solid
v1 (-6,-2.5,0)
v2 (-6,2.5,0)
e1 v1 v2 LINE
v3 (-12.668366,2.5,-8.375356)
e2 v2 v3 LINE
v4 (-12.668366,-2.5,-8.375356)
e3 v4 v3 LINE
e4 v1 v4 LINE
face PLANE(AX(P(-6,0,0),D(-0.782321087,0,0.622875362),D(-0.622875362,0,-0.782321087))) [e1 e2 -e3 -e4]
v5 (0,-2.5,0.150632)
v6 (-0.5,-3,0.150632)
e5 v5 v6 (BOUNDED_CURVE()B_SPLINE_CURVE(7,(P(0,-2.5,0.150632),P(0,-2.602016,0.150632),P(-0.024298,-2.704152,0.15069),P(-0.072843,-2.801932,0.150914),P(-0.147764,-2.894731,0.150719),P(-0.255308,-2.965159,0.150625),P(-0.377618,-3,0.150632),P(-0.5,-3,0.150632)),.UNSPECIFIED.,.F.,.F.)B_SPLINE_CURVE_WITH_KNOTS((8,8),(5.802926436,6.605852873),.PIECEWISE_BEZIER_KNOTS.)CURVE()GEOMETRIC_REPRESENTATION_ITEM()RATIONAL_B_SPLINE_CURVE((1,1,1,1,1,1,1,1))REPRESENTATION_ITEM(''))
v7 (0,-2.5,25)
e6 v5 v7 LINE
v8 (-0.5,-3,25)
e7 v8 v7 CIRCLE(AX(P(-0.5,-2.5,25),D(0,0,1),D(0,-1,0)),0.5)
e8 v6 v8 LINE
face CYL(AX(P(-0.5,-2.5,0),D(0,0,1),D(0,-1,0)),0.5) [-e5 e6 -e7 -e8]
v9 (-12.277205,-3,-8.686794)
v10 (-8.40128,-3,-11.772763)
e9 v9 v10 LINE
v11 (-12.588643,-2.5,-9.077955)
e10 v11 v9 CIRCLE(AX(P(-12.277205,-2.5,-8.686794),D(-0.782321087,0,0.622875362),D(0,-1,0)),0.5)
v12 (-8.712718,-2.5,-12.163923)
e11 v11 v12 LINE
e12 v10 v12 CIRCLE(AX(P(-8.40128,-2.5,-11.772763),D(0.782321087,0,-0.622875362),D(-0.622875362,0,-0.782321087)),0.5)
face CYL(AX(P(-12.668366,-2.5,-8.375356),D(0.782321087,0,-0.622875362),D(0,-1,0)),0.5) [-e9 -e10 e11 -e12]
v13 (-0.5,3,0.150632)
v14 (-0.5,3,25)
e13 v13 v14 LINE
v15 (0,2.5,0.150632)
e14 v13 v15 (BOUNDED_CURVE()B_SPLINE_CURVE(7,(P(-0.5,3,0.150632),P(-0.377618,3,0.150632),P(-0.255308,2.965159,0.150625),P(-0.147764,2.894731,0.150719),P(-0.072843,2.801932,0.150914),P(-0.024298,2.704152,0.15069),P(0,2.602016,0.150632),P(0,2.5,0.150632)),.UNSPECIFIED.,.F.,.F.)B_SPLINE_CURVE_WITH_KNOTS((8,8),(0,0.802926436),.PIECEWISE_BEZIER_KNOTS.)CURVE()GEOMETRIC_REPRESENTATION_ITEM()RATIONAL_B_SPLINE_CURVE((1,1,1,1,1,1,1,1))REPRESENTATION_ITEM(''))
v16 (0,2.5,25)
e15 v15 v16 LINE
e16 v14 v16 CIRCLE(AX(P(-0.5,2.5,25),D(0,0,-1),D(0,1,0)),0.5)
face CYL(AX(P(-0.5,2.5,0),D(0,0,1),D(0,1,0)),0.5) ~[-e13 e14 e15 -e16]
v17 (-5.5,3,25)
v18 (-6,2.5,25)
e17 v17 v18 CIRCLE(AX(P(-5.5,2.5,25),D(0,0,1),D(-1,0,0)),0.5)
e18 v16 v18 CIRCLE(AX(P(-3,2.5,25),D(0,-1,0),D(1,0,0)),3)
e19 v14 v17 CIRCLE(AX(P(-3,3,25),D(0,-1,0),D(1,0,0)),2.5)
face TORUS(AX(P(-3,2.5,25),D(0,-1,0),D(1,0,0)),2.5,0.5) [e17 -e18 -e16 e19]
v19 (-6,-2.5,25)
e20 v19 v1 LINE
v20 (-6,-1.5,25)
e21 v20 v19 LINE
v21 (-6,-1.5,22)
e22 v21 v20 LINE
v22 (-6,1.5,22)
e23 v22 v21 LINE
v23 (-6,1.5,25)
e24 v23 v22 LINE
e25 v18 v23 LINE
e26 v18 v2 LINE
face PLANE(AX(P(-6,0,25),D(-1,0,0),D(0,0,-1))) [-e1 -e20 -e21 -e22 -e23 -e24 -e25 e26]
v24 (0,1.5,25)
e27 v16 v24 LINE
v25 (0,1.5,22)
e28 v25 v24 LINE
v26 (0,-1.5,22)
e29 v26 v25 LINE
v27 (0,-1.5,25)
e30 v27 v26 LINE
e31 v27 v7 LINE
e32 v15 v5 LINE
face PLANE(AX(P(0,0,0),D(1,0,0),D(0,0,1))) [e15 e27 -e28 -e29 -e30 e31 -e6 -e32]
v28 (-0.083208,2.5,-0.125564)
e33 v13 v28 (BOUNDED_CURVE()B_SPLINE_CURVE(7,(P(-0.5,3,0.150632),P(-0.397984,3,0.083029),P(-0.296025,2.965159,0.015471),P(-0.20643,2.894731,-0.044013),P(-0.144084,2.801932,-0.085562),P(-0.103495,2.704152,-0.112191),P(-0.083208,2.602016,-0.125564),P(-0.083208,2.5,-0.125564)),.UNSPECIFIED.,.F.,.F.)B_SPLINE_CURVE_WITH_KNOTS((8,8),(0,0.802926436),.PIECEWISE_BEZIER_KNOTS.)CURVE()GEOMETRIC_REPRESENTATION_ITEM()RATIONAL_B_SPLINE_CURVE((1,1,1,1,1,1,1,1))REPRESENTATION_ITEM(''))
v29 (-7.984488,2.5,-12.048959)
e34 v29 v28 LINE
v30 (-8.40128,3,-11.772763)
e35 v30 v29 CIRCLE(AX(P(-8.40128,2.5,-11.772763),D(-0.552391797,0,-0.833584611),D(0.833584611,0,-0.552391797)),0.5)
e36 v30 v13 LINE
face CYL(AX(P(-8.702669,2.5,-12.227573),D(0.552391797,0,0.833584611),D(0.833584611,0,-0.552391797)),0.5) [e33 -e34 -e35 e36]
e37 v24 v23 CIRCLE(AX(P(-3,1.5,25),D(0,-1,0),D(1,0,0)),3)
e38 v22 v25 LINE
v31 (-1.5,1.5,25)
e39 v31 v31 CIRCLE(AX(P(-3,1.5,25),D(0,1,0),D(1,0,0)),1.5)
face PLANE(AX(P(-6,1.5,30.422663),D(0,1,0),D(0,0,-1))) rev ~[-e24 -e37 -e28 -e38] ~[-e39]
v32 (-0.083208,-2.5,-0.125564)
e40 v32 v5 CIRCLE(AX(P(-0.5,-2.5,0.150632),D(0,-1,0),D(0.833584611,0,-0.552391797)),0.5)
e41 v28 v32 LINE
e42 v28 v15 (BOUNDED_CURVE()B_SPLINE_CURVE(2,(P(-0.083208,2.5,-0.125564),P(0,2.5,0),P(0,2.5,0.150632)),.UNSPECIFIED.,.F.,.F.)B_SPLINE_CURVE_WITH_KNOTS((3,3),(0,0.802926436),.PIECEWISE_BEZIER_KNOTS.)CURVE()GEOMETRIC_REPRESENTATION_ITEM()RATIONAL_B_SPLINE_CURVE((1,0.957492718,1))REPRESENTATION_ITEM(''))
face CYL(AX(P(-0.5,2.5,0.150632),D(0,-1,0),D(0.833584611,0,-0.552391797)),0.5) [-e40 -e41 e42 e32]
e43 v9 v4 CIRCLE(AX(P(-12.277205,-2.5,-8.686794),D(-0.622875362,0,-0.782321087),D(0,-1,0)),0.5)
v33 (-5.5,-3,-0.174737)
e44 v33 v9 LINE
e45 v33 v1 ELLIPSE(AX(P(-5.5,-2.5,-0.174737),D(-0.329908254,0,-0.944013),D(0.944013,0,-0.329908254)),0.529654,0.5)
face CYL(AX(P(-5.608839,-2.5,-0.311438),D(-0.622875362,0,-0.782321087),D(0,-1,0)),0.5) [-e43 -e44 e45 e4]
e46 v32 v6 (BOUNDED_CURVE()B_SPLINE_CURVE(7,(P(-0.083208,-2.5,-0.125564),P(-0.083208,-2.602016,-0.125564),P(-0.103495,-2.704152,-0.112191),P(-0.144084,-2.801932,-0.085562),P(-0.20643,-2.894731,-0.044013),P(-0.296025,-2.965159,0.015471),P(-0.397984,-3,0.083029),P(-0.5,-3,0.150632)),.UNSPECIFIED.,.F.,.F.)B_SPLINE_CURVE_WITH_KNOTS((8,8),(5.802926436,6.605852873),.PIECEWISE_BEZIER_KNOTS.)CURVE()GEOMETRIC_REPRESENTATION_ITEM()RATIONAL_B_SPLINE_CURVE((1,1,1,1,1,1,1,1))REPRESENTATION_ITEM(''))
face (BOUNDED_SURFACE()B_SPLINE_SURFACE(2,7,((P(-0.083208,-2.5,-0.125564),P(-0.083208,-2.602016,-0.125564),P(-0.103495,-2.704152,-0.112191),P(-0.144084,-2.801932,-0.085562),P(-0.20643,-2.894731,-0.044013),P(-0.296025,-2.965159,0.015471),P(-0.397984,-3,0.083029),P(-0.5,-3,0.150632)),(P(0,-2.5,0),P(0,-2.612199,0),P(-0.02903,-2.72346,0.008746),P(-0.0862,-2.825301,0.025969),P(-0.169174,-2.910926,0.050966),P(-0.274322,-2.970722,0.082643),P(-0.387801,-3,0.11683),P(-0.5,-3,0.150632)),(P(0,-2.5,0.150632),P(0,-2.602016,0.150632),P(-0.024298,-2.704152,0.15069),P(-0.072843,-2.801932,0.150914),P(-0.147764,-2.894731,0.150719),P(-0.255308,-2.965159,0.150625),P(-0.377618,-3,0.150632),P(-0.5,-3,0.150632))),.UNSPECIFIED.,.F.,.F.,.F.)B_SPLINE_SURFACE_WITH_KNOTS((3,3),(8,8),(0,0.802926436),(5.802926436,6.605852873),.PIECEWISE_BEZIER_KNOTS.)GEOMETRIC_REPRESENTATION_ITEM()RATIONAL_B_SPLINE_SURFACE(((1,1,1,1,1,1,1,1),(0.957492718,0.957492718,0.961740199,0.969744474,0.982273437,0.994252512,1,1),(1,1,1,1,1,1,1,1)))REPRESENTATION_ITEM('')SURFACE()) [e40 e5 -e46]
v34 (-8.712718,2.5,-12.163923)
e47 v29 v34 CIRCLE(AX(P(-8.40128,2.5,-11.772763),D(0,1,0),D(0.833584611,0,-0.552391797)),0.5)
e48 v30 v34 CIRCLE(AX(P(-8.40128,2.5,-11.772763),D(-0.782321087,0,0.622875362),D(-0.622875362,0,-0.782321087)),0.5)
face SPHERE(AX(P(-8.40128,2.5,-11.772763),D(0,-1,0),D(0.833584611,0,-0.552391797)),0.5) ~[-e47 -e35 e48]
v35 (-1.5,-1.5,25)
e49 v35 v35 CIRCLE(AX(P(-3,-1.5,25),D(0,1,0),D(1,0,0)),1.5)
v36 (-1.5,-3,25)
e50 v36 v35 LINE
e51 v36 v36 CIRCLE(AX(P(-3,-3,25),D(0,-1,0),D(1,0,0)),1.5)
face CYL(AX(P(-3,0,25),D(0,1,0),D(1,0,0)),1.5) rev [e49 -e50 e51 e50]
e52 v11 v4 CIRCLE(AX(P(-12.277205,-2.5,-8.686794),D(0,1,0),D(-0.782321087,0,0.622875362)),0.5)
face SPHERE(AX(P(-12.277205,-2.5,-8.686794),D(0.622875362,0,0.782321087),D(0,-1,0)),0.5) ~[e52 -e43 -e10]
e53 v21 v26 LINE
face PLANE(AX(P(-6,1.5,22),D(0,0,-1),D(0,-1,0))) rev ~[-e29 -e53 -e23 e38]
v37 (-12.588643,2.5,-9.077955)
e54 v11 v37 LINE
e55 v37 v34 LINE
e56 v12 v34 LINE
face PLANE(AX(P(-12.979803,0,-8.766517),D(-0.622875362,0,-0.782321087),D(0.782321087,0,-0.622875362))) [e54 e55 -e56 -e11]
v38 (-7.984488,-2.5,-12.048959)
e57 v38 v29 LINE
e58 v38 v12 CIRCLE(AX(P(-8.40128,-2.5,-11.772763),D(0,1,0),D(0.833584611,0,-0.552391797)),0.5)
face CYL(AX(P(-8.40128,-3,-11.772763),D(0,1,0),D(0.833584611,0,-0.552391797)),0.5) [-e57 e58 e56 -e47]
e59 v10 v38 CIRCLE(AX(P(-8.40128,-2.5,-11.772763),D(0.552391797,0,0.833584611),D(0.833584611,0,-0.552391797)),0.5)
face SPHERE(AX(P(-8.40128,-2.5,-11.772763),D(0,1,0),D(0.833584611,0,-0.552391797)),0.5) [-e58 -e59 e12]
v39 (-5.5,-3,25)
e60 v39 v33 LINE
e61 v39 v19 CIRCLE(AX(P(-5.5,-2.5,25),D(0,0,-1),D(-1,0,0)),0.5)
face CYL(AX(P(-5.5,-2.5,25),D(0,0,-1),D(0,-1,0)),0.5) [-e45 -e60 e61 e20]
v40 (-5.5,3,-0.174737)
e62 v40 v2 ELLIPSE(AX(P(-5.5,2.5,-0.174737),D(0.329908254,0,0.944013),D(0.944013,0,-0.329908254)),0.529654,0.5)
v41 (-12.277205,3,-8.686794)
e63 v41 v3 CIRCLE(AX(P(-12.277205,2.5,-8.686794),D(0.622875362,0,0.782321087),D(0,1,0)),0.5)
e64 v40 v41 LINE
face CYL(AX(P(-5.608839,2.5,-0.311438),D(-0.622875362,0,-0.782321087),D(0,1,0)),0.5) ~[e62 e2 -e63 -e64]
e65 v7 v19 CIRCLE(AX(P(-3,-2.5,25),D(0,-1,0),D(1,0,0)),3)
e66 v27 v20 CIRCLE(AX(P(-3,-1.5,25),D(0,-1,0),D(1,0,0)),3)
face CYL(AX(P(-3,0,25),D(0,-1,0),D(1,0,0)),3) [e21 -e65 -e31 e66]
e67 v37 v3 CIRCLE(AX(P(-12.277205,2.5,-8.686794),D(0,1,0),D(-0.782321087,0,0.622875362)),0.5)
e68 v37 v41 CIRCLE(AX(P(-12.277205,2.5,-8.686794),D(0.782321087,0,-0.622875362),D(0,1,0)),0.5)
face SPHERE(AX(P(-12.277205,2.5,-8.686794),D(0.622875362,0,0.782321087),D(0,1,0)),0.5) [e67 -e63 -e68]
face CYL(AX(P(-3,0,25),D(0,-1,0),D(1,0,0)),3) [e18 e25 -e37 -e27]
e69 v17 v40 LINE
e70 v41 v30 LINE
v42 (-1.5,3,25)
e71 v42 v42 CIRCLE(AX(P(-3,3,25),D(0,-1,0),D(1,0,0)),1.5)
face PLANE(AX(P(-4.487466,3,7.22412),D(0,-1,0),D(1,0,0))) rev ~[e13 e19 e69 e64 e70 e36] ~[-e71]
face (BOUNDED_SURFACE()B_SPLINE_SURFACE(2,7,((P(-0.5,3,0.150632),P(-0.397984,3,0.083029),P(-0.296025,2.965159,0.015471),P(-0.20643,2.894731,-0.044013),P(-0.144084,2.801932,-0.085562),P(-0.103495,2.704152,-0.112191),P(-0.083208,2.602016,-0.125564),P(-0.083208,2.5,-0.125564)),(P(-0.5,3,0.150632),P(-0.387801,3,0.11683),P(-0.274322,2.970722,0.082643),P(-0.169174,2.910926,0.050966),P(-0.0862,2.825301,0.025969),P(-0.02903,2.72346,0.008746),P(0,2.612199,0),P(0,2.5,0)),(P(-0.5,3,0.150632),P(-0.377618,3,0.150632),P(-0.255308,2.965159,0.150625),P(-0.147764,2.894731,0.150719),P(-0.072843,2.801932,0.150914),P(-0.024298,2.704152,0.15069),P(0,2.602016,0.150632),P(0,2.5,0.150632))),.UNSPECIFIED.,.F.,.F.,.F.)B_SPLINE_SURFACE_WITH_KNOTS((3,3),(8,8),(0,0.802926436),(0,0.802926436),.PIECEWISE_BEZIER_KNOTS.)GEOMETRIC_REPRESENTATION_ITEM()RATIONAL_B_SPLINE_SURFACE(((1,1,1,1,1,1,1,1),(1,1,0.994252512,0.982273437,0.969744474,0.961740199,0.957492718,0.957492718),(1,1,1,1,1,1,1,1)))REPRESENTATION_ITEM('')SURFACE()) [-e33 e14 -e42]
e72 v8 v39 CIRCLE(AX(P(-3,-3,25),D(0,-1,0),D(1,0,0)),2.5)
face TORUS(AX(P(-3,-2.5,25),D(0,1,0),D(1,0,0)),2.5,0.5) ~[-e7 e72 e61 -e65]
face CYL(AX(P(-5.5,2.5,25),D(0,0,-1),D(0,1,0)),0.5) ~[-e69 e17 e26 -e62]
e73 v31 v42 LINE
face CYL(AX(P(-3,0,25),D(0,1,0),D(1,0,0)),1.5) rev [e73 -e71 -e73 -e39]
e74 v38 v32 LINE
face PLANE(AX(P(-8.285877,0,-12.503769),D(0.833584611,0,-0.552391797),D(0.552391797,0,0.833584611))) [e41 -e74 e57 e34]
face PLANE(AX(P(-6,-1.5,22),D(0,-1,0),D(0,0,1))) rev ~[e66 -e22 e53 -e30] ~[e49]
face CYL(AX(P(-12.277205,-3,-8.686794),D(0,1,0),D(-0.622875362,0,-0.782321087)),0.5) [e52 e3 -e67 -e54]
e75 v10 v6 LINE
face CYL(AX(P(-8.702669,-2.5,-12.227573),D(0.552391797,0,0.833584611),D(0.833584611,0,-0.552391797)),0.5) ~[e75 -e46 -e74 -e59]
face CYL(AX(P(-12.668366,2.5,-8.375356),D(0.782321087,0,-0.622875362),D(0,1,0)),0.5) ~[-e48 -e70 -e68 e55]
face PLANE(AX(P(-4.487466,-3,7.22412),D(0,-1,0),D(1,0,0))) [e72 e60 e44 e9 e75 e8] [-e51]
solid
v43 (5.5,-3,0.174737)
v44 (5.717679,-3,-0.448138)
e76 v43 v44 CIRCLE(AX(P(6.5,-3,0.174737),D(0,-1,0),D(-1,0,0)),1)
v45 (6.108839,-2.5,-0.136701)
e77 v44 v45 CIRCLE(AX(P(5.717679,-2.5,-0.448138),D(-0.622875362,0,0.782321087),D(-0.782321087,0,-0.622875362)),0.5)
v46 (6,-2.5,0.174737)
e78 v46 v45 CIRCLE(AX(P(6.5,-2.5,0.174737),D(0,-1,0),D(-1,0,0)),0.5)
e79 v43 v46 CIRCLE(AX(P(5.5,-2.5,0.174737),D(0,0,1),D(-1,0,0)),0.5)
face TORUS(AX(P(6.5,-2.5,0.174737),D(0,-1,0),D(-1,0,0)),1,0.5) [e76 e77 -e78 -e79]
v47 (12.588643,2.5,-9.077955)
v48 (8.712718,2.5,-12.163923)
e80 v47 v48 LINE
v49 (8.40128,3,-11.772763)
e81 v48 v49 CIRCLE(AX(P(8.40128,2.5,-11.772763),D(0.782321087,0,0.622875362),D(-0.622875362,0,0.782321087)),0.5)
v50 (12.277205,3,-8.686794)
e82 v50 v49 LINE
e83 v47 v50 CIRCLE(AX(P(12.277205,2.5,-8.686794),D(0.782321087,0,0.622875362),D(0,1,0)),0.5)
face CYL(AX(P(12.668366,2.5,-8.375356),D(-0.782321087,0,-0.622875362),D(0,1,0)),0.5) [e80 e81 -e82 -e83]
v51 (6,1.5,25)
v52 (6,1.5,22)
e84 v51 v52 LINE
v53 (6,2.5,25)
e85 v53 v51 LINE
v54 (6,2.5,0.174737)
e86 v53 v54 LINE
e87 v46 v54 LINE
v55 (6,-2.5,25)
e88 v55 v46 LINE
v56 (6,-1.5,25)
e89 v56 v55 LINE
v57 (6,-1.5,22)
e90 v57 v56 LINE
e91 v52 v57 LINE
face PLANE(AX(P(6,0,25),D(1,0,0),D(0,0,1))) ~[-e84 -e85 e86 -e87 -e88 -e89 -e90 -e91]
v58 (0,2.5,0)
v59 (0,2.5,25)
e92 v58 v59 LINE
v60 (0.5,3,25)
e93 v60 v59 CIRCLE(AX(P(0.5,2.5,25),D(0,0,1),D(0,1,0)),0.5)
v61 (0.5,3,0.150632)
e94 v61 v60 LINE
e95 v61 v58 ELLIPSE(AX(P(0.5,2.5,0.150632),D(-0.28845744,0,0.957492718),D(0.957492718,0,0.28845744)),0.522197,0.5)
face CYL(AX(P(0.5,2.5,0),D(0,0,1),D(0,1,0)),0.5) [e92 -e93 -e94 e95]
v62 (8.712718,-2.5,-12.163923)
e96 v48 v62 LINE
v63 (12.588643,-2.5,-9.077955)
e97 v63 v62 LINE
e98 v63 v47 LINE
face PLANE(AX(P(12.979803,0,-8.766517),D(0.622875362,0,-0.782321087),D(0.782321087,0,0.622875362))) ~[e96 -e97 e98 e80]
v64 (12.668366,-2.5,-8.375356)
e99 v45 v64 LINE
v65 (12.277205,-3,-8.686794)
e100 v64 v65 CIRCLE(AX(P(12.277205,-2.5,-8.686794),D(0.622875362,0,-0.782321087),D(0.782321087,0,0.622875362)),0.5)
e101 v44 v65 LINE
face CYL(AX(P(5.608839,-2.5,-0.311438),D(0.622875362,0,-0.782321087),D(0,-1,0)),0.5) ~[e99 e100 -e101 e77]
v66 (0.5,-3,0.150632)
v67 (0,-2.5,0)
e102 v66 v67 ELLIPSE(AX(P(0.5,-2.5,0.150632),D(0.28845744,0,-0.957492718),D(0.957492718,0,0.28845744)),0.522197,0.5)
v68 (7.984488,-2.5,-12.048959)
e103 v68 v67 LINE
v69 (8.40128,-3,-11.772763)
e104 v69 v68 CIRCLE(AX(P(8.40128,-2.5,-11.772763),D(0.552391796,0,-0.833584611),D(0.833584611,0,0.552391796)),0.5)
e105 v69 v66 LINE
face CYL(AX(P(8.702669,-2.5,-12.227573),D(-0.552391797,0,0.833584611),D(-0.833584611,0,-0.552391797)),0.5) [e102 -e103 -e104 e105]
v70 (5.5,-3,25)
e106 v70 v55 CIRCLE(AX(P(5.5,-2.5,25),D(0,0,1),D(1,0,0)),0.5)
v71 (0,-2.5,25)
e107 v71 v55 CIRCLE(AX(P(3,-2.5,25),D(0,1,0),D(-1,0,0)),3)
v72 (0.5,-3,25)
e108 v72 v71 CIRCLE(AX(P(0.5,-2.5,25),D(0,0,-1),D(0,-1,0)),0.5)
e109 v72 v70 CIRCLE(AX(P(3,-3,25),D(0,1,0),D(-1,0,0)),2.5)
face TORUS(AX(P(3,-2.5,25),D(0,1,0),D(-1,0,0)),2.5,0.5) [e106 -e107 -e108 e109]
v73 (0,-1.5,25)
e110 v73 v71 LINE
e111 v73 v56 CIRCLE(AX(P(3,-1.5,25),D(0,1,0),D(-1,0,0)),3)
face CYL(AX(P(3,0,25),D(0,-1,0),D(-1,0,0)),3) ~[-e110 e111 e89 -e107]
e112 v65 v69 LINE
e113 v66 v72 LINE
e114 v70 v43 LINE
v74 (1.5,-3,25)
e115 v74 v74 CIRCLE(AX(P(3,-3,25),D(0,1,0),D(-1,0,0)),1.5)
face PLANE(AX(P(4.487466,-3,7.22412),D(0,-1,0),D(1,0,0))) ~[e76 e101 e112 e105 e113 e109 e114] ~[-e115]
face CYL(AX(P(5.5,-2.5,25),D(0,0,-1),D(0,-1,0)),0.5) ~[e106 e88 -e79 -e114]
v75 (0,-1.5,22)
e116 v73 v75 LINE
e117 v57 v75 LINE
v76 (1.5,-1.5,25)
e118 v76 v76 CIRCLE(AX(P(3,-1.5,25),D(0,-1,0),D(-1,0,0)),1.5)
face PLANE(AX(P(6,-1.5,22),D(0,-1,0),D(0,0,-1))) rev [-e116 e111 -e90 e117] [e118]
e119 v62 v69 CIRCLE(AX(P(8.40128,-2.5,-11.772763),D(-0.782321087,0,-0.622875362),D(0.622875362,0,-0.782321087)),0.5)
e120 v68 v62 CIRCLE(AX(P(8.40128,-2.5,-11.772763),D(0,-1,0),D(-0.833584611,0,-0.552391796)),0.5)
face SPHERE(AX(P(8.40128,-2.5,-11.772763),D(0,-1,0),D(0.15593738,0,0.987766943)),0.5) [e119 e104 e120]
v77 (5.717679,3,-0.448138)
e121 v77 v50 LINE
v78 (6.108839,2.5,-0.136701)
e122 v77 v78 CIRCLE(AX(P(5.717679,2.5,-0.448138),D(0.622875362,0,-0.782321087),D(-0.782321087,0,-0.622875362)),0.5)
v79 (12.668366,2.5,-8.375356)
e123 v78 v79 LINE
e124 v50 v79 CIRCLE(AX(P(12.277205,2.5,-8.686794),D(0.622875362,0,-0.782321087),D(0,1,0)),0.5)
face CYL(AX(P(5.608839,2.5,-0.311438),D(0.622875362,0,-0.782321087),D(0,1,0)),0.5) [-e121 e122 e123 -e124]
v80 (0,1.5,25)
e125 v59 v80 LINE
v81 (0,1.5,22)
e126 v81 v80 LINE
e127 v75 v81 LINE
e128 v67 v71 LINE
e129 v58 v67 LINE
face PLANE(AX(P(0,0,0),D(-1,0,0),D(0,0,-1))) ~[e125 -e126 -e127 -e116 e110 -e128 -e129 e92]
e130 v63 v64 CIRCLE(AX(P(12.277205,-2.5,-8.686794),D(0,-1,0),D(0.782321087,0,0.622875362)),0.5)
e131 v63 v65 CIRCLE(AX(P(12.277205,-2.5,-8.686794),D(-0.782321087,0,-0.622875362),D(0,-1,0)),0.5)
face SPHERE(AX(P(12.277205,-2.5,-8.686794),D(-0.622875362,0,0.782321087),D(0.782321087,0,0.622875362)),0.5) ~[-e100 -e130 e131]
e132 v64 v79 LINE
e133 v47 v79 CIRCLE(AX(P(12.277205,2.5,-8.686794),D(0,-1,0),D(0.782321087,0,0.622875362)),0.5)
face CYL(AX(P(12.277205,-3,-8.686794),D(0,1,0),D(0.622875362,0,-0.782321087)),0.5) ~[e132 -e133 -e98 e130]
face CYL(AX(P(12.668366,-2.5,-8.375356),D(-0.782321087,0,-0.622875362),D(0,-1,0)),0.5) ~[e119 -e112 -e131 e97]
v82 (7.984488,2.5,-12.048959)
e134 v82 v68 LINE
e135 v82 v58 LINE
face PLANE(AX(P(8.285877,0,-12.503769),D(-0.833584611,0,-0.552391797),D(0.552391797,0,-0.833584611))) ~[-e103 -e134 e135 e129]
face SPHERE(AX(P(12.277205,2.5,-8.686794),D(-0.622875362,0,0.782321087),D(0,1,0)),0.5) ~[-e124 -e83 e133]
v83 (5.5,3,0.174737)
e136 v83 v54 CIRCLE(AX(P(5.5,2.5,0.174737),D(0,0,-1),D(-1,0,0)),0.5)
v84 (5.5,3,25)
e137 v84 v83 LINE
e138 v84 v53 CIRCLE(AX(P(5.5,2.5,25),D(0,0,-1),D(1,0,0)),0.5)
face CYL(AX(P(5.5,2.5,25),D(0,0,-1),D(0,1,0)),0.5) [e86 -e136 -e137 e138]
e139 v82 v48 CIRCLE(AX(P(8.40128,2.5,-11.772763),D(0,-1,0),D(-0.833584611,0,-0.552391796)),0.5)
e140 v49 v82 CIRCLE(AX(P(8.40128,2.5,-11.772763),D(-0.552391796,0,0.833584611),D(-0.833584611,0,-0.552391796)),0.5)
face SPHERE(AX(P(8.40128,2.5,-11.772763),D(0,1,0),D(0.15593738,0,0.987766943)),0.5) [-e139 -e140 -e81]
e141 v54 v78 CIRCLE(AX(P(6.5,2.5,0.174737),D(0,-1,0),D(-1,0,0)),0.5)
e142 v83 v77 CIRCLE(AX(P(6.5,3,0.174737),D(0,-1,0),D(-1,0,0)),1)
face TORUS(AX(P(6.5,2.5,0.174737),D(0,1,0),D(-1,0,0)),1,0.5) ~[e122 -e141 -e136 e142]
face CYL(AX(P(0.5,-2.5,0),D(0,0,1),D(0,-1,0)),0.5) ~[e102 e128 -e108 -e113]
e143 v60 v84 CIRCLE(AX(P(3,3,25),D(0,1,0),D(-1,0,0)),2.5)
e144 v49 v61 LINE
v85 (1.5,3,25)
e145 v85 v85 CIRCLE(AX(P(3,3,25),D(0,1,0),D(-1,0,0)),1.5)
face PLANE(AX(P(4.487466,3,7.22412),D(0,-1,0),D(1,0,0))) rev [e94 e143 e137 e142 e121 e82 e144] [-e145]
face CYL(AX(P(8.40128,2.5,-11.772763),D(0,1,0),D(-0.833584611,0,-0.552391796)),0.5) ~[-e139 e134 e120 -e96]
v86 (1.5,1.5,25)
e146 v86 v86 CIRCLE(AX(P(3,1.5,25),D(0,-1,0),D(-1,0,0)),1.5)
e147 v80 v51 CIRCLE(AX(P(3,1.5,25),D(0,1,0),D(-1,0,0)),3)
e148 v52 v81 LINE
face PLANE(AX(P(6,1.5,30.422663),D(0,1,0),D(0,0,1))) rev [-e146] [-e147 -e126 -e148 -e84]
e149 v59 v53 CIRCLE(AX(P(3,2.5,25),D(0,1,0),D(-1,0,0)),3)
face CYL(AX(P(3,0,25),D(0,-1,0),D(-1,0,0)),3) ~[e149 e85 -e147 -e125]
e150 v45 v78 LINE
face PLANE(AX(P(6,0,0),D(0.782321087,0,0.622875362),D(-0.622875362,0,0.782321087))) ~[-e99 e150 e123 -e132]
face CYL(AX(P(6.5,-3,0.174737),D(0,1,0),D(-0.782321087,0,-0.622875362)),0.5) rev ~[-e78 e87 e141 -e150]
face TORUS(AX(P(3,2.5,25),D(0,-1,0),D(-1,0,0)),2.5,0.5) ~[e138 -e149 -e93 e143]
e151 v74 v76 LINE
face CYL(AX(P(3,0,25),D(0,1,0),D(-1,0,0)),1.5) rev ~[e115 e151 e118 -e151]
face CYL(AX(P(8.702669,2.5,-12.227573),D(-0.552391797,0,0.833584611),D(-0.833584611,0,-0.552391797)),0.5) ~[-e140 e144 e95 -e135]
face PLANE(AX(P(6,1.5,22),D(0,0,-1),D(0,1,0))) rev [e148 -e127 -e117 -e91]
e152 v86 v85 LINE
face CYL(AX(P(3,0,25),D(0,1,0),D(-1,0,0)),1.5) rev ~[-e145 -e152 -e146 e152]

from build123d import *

# Parameters (mm, degrees)
F0_R         = 1.5
F1_DEPTH     = 3
F2_W         = 3
F2_H         = 5.4226633161
F2_H_2       = 3
F3_DEPTH     = 6.001
F5_R         = 0.5
F5_2_R       = 0.5
F6_T1_DEPTH  = 5
F6_T6_DEPTH  = 0.5
F6_T12_DEPTH = 0.5
F7_R         = 0.5


# Not quite as in the source:
# - a fillet or chamfer that OpenCascade refuses, or shapes differently, is made with other operations: its cross-section is extruded or revolved along the edge and cut away or added


with BuildPart() as f1:
    # F0 (on Front) → F1 (new body, symmetric)
    with BuildSketch(Plane.XZ):
        with BuildLine():
            Line((-8.285876948, -12.5037691598), (0, 0))
            Line((0, 0), (0, 25))
            ThreePointArc((0, 25), (-3, 28), (-6, 25))
            Line((-6, 25), (-6, 0))
            Line((-6, 0), (-12.9798034719, -8.766516989))
            Line((-12.9798034719, -8.766516989), (-8.285876948, -12.5037691598))
        make_face()
        with Locations((-3, 25)):
            Circle(F0_R, mode=Mode.SUBTRACT)
    extrude(amount=F1_DEPTH, both=True)

    # F2 (on face) → F3 (cut, through all)
    with BuildSketch(Plane(origin=(-6, 0, 0), x_dir=(0, -1, 0), z_dir=(-1, 0, 0))):
        with Locations((0, 27.7113316581)):
            Rectangle(F2_W, F2_H)
        with Locations((0, 23.5)):
            Rectangle(F2_W, F2_H_2)
    extrude(amount=-F3_DEPTH, mode=Mode.SUBTRACT)


with BuildPart() as f4_1:
    # F4: instance of F1
    add(f1.part.mirror(Plane.YZ))

    # F5
    f5_edges = [f4_1.edges().sort_by_distance(p)[0] for p in [
        (6, -3, 12.5),
        (4.142938, -3, -6.251885),
        (9.489902, -3, -4.383258),
        (9.489902, 3, -4.383258),
        (6, 0, 0),
        (6, 3, 12.5),
        (4.142938, 3, -6.251885),
        (10.63284, 3, -10.635143),
        (12.979803, 0, -8.766517),
        (10.63284, -3, -10.635143),
    ]]
    fillet(f5_edges, radius=F5_R)

    # F6: fillet of radius 0.5 on 1 edges, made by hand

    # F6_s2 → F6_t1 (cut)
    with BuildSketch(Plane.XZ.offset(-2.5)):
        with BuildLine():
            ThreePointArc((7.9844875816, -12.0489587531), (8.3233111968, -12.2666463263), (8.7127175678, -12.1639233985))
            Line((8.7127175678, -12.1639233985), (8.285876948, -12.5037691598))
            Line((8.285876948, -12.5037691598), (7.9844875816, -12.0489587531))
        make_face()
    extrude(amount=F6_T1_DEPTH, mode=Mode.SUBTRACT)


with BuildPart() as f1_1:
    add(f1.part)

    # F5#2
    f5_2_edges = [f1_1.edges().sort_by_distance(p)[0] for p in [
        (-6, -3, 12.5),
        (-4.142938, -3, -6.251885),
        (-9.489902, -3, -4.383258),
        (-10.63284, -3, -10.635143),
        (0, 3, 12.5),
        (-6, 3, 12.5),
        (-9.489902, 3, -4.383258),
        (-4.142938, 3, -6.251885),
        (-10.63284, 3, -10.635143),
        (-8.285877, 0, -12.503769),
        (-12.979803, 0, -8.766517),
    ]]
    fillet(f5_2_edges, radius=F5_2_R)

    # F7
    f7_edges = [f1_1.edges().sort_by_distance(p)[0] for p in [
        (0, 0, 0),
    ]]
    fillet(f7_edges, radius=F7_R)


with BuildPart() as f6_tool4:
    # F6_s5 → F6_t6 (new body)
    with BuildSketch(Plane.XZ.offset(2.5)):
        Polygon((8.4012798869, -11.7727628549), (7.9844875816, -12.0489587531), (8.285876948, -12.5037691598), (8.7127175678, -12.1639233985), align=None)
    extrude(amount=F6_T6_DEPTH)

    # F6_s7 → F6_t8 (revolve, cut)
    with BuildSketch(Plane(origin=(8.4012798869, -2.5, -11.7727628549), x_dir=(0.1559373803, 0, 0.9877669429), z_dir=(0.9877669429, 0, -0.1559373803))):
        with BuildLine():
            ThreePointArc((0, -0.5), (0.5, 0), (0, 0.5))
            Line((0, 0.5), (0, -0.5))
        make_face()
    revolve(axis=Axis((8.4012798869, -2.5, -11.7727628549), (0, -1, 0)), mode=Mode.SUBTRACT)


with BuildPart() as f4_1_1:
    add(f4_1.part)

    # F6_t3: cut F6_tool4
    add(f6_tool4.part, mode=Mode.SUBTRACT)


with BuildPart() as f6_tool10:
    # F6_s11 → F6_t12 (new body)
    with BuildSketch(Plane.XZ.offset(-2.5)):
        Polygon((8.4012798869, -11.7727628549), (7.9844875816, -12.0489587531), (8.285876948, -12.5037691598), (8.7127175678, -12.1639233985), align=None)
    extrude(amount=-F6_T12_DEPTH)

    # F6_s13 → F6_t14 (revolve, cut)
    with BuildSketch(Plane(origin=(8.4012798869, 2.5, -11.7727628549), x_dir=(0.1559373803, 0, 0.9877669429), z_dir=(-0.9877669429, 0, 0.1559373803))):
        with BuildLine():
            ThreePointArc((0, -0.5), (0.5, 0), (0, 0.5))
            Line((0, 0.5), (0, -0.5))
        make_face()
    revolve(axis=Axis((8.4012798869, 2.5, -11.7727628549), (0, 1, 0)), mode=Mode.SUBTRACT)


with BuildPart() as f4_1_2:
    add(f4_1_1.part)

    # F6_t9: cut F6_tool10
    add(f6_tool10.part, mode=Mode.SUBTRACT)


solid = Compound([f1_1.part, f4_1_2.part])
